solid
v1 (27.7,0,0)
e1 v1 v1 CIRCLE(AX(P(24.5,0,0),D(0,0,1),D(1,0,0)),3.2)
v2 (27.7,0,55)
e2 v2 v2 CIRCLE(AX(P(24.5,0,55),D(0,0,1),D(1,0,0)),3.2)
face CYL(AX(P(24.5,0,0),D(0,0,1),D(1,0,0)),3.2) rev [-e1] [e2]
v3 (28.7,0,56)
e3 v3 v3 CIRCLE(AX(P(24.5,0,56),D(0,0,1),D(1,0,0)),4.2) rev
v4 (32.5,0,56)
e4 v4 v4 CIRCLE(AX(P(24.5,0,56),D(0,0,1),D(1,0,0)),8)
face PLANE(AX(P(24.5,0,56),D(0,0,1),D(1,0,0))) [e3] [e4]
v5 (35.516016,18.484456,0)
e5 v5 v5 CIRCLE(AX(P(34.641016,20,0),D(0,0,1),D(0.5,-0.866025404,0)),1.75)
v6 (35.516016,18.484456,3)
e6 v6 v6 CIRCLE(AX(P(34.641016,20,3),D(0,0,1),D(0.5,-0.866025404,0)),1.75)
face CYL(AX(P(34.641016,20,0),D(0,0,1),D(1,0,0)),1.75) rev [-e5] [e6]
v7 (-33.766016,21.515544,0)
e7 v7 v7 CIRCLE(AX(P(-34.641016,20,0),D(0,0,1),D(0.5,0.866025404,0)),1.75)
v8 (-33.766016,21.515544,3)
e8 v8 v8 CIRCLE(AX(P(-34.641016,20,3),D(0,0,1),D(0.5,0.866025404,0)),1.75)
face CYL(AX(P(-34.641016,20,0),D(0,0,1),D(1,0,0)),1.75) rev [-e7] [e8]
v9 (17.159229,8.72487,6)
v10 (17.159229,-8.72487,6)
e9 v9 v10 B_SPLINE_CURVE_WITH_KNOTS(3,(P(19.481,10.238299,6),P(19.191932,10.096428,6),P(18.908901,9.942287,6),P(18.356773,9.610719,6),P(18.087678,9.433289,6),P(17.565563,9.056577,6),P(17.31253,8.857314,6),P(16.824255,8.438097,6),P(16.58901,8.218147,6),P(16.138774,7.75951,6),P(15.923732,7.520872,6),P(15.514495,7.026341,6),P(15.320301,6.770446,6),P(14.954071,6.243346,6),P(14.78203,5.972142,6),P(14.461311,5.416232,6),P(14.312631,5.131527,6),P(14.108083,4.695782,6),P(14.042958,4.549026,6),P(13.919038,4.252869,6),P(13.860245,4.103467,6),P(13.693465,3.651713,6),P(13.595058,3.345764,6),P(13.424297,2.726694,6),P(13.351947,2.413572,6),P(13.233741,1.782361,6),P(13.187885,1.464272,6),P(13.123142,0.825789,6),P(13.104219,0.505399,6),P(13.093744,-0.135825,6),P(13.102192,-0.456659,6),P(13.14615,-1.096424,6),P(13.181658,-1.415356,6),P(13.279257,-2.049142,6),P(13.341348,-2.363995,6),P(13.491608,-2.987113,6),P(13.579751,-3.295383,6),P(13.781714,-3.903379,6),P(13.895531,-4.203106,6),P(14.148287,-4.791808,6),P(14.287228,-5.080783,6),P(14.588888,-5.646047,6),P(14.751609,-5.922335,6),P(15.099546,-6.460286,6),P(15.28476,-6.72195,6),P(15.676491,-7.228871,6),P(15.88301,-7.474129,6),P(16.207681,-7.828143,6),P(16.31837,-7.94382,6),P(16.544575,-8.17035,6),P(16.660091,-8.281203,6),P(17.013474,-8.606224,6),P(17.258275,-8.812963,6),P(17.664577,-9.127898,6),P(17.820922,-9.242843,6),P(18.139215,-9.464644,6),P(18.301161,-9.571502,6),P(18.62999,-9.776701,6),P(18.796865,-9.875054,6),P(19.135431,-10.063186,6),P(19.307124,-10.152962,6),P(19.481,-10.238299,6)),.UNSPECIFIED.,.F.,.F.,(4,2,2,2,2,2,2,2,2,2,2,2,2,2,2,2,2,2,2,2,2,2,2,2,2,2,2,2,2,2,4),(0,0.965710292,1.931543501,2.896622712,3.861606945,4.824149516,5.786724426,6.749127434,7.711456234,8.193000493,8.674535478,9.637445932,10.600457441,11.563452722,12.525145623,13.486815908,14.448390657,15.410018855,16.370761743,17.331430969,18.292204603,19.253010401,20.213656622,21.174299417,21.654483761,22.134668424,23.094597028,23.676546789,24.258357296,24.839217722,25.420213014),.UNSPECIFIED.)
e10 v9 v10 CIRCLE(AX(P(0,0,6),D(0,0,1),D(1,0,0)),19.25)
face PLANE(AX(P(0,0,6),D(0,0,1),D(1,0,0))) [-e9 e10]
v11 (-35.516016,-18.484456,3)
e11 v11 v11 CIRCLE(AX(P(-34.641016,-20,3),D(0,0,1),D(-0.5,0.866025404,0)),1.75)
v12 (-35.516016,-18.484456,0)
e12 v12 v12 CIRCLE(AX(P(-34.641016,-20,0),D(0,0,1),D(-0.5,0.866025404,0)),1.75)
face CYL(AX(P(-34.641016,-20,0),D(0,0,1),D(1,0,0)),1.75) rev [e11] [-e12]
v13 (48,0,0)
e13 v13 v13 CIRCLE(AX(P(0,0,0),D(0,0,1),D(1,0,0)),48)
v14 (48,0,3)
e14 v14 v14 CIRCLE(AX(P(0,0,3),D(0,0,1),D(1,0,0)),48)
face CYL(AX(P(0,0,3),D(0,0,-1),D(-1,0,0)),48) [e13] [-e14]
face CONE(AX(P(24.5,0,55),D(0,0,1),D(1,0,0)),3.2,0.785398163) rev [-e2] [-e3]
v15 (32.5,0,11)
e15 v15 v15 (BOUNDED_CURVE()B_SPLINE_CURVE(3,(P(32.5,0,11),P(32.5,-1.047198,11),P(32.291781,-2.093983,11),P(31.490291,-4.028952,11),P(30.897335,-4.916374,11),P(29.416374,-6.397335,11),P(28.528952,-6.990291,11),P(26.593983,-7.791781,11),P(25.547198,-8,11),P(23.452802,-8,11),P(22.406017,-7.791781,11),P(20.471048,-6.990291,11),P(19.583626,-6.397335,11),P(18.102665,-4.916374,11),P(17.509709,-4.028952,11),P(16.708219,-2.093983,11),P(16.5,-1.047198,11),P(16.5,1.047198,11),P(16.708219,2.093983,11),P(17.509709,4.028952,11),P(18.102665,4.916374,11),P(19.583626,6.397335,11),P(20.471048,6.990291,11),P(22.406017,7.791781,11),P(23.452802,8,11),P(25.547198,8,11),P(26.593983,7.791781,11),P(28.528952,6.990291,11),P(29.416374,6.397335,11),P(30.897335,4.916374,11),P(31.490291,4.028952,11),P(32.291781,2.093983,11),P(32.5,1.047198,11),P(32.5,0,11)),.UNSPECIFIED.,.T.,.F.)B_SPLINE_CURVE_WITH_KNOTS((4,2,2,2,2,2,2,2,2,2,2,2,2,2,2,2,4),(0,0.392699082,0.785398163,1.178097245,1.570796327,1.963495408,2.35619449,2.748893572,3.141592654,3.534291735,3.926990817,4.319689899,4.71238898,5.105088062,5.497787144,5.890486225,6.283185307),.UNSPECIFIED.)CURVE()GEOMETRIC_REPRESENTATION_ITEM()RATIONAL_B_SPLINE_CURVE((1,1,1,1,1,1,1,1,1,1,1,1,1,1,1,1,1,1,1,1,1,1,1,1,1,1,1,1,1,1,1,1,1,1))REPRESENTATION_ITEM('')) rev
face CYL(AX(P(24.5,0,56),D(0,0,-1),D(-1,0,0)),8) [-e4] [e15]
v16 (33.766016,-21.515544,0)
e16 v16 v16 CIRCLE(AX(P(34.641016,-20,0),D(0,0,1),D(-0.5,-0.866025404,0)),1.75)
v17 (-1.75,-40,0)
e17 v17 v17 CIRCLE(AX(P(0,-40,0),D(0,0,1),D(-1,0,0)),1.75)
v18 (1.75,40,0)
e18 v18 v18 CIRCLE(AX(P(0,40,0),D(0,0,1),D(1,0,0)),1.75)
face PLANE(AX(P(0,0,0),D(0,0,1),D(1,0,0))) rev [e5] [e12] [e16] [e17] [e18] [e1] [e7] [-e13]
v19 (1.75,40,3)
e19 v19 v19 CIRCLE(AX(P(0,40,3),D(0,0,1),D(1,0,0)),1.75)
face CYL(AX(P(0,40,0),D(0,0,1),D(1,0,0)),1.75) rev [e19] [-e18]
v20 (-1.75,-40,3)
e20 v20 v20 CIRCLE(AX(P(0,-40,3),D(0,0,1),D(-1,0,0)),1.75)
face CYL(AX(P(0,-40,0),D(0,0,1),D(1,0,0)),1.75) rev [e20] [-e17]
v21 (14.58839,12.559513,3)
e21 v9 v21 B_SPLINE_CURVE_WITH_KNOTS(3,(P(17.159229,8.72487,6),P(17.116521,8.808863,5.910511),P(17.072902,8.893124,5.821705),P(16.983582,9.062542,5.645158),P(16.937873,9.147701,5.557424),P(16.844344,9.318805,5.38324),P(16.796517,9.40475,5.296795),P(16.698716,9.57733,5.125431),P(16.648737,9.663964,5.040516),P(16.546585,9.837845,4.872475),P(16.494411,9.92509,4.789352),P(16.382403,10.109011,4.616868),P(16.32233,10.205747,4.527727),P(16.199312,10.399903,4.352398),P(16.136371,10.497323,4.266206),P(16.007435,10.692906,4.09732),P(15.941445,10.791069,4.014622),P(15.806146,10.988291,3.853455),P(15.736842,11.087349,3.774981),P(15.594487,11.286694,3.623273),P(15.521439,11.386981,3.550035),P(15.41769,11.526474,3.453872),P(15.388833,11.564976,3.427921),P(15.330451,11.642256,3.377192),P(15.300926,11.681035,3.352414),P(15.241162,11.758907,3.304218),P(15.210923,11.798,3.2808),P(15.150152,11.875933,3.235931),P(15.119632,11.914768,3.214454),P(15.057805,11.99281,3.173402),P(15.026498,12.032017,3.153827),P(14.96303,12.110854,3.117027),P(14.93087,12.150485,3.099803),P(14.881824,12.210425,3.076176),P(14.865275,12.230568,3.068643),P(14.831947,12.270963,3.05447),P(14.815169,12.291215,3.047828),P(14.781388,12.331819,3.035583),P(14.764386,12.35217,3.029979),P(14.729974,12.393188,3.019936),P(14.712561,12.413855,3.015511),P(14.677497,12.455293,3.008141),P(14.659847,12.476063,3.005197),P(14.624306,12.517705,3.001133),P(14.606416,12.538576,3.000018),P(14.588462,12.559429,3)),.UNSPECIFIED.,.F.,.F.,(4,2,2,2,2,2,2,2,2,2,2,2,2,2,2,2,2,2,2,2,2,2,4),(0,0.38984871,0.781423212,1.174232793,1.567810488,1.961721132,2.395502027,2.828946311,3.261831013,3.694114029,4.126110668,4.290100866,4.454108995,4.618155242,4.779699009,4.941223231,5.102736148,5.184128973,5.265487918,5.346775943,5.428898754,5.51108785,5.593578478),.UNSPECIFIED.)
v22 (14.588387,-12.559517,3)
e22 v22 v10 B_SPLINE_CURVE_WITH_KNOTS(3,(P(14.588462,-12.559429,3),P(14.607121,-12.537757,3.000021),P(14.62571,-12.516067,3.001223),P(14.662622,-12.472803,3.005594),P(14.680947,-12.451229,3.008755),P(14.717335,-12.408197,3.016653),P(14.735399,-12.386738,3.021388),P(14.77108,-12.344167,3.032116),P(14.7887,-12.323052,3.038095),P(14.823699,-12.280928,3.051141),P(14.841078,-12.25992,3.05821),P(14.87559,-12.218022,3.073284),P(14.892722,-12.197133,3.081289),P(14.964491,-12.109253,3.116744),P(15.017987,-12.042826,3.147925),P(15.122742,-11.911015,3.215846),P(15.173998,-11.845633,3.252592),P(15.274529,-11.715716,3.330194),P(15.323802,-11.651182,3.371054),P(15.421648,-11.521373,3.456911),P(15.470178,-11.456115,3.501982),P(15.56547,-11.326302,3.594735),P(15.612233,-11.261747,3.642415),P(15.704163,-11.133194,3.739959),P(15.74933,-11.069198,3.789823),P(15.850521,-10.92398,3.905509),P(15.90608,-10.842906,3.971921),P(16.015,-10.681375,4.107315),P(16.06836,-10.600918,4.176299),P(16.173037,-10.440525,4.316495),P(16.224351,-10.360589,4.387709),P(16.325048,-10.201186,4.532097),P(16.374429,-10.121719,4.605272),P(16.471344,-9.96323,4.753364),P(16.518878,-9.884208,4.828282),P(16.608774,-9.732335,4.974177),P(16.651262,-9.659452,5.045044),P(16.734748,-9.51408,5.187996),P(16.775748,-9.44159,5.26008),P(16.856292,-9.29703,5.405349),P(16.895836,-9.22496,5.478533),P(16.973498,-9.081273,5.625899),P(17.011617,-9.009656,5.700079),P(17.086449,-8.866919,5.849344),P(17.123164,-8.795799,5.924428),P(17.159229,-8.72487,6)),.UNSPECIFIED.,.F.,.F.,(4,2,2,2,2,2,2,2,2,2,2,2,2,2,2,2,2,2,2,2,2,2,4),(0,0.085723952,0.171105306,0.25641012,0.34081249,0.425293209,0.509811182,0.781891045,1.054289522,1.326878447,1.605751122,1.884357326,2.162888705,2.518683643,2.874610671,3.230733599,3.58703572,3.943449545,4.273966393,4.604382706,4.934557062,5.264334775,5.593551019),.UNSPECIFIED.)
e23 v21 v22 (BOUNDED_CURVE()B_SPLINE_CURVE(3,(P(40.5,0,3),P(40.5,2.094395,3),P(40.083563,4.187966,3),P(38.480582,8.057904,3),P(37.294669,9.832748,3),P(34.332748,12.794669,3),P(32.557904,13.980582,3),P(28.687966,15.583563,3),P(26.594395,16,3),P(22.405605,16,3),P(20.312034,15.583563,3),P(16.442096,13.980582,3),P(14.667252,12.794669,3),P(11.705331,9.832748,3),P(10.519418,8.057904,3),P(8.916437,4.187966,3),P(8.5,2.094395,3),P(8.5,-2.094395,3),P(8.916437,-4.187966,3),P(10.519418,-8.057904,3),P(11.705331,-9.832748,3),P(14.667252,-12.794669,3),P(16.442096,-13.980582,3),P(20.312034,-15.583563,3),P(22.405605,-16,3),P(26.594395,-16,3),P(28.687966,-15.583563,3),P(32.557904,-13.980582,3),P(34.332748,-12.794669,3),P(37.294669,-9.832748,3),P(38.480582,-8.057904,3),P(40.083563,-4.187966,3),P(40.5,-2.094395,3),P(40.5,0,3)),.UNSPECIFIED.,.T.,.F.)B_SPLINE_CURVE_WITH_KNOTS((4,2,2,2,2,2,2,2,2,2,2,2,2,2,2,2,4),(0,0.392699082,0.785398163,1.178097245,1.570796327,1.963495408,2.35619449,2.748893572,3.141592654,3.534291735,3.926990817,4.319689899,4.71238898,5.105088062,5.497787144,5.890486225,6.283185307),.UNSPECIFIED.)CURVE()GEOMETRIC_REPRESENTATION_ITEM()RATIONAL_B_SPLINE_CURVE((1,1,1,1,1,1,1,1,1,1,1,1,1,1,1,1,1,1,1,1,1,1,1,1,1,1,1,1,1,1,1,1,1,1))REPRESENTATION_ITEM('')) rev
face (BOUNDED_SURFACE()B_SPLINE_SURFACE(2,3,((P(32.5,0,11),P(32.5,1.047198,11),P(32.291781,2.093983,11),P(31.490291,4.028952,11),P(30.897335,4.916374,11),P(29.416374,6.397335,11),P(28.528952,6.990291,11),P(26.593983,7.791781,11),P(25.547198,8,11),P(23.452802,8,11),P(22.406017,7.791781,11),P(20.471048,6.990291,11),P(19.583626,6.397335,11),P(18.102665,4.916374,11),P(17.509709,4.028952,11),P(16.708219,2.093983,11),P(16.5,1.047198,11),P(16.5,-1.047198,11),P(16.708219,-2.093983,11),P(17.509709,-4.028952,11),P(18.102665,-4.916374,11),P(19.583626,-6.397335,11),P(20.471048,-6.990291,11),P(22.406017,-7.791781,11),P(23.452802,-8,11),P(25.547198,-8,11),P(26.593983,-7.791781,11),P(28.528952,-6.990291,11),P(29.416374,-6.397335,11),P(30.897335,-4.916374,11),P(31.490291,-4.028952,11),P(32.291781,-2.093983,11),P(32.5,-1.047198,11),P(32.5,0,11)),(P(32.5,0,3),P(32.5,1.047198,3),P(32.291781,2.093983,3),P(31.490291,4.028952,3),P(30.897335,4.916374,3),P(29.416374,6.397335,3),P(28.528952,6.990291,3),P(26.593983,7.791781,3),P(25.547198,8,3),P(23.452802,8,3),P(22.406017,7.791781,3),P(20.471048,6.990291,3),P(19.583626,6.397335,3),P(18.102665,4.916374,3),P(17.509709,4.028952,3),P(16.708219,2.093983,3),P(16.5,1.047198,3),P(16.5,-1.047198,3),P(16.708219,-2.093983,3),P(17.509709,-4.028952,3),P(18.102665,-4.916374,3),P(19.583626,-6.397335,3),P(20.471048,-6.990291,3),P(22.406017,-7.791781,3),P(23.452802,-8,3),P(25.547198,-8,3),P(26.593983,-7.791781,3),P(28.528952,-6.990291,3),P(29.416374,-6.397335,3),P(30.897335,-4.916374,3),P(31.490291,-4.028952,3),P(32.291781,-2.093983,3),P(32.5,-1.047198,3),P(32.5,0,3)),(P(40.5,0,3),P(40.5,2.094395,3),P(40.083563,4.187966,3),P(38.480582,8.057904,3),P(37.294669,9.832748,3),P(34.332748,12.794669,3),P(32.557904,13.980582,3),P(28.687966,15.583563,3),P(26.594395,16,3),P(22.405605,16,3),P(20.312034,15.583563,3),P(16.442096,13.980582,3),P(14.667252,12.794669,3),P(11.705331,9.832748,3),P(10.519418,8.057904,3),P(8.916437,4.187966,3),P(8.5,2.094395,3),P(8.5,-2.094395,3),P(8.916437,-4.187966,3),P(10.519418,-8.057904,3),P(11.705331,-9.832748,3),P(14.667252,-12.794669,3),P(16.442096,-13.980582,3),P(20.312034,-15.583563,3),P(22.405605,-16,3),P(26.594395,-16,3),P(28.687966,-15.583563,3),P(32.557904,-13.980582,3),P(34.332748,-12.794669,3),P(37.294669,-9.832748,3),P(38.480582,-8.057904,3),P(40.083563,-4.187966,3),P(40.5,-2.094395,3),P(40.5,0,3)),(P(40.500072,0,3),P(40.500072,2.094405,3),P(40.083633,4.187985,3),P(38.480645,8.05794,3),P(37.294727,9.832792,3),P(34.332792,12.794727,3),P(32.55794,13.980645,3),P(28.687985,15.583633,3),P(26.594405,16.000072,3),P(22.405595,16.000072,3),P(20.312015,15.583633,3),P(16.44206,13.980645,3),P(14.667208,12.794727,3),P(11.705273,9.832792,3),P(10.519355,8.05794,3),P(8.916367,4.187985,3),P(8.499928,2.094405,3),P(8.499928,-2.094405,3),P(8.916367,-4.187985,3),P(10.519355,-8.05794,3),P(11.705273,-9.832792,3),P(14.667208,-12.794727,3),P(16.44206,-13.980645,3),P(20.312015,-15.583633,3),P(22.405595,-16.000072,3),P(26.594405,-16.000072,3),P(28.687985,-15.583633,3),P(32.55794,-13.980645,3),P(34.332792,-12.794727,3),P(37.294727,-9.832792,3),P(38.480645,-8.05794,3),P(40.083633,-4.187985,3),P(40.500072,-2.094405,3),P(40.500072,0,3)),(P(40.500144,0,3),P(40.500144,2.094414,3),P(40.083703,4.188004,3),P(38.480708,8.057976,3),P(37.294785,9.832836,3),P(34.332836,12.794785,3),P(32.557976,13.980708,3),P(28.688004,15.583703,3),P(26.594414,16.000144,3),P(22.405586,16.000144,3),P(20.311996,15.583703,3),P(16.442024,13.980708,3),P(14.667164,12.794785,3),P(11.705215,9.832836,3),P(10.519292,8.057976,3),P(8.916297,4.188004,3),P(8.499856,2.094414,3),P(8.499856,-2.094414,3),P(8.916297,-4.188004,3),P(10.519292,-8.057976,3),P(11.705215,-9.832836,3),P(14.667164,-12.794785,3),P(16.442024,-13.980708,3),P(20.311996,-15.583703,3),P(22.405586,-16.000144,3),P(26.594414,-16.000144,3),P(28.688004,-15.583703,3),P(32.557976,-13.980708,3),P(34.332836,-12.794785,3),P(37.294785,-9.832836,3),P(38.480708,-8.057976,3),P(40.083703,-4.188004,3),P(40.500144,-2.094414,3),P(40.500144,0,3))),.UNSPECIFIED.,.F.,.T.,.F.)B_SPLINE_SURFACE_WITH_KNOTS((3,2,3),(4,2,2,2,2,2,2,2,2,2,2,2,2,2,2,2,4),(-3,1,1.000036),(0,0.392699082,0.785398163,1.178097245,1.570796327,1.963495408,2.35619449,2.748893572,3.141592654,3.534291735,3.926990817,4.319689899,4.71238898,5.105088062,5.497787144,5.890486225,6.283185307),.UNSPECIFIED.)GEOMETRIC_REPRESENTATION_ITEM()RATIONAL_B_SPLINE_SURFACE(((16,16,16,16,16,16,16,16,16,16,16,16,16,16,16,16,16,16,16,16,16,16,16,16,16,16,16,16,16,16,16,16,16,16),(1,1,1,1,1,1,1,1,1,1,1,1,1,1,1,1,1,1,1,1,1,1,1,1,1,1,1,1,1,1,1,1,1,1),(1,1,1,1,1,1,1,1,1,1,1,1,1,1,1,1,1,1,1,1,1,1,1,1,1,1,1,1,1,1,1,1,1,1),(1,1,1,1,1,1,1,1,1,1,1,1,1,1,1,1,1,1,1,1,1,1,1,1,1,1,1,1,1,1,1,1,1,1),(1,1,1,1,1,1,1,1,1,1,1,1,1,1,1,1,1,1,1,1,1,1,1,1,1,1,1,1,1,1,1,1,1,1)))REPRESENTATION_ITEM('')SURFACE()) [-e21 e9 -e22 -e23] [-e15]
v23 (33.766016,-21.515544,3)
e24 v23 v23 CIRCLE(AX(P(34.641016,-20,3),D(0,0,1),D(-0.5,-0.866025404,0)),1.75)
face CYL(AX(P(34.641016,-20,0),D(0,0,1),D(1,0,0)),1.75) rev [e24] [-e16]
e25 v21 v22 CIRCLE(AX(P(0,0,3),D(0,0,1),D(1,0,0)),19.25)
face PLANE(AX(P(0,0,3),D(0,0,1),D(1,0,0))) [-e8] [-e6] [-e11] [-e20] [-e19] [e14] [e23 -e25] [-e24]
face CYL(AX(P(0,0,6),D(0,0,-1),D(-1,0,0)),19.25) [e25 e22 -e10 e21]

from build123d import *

# Parameters (mm, degrees)
SKETCH1_R           = 48
BOSS_EXTRUDE1_DEPTH = 3
SKETCH2_R           = 1.75
CUT_EXTRUDE1_DEPTH  = 3
CIRPATTERN1_COUNT   = 6
SKETCH3_R           = 8
BOSS_EXTRUDE2_DEPTH = 53
SKETCH4_R           = 3.2
CUT_EXTRUDE2_DEPTH  = 89
CHAMFER1_SIZE       = 1
FILLET1_SIZE        = 8
SKETCH5_R           = 19.25
BOSS_EXTRUDE3_DEPTH = 3


with BuildPart() as part:
    # Sketch1 → Boss-Extrude1 (new body)
    with BuildSketch(Plane.XY):
        Circle(SKETCH1_R)
    extrude(amount=BOSS_EXTRUDE1_DEPTH)

    # Sketch2 → Cut-Extrude1 (cut)
    with BuildSketch(Plane.XY.offset(3)):
        with Locations((0, 40)):
            Circle(SKETCH2_R)
    cut_extrude1 = extrude(amount=-CUT_EXTRUDE1_DEPTH, mode=Mode.SUBTRACT)

    # CirPattern1: Cut-Extrude1 ×6 about axis
    cirpattern1_axis = Axis((0, 0, 0), (0, 0, 1))
    for i in range(1, CIRPATTERN1_COUNT):
        add(cut_extrude1.rotate(cirpattern1_axis, i * 360 / CIRPATTERN1_COUNT), mode=Mode.SUBTRACT)

    # Sketch3 → Boss-Extrude2 (add)
    with BuildSketch(Plane.XY.offset(3)):
        with Locations((24.5, 0)):
            Circle(SKETCH3_R)
    extrude(amount=BOSS_EXTRUDE2_DEPTH)

    # Sketch4 → Cut-Extrude2 (cut, through all)
    with BuildSketch(Plane.XY.offset(56)):
        with Locations((24.5, 0)):
            Circle(SKETCH4_R)
    extrude(amount=-CUT_EXTRUDE2_DEPTH, mode=Mode.SUBTRACT)

    # Chamfer1
    chamfer1_edges = [part.edges().sort_by_distance(p)[0] for p in [
        (21.3, 0, 56),
    ]]
    chamfer(chamfer1_edges, length=CHAMFER1_SIZE)

    # Fillet1
    # a fillet whose section is not a circle: 8 mm, written as the material it adds along each edge
    with BuildSketch(Plane(origin=(24.5, 0, 3), x_dir=(1, 0, 0), z_dir=(0, -1, 0))) as fillet1_piece_1:
        with BuildLine():
            Bezier((8, FILLET1_SIZE), (8, 0), (8 + FILLET1_SIZE, 0), weights=[1, 0.25, 1])
            Line((8 + FILLET1_SIZE, 0), (8, 0))
            Line((8, 0), (8, FILLET1_SIZE))
        make_face()
    revolve(axis=Axis((24.5, 0, 3), (0, 0, 1)))

    # Sketch5 → Boss-Extrude3 (add)
    with BuildSketch(Plane.XY.offset(3)):
        Circle(SKETCH5_R)
    extrude(amount=BOSS_EXTRUDE3_DEPTH)


solid = part.part
